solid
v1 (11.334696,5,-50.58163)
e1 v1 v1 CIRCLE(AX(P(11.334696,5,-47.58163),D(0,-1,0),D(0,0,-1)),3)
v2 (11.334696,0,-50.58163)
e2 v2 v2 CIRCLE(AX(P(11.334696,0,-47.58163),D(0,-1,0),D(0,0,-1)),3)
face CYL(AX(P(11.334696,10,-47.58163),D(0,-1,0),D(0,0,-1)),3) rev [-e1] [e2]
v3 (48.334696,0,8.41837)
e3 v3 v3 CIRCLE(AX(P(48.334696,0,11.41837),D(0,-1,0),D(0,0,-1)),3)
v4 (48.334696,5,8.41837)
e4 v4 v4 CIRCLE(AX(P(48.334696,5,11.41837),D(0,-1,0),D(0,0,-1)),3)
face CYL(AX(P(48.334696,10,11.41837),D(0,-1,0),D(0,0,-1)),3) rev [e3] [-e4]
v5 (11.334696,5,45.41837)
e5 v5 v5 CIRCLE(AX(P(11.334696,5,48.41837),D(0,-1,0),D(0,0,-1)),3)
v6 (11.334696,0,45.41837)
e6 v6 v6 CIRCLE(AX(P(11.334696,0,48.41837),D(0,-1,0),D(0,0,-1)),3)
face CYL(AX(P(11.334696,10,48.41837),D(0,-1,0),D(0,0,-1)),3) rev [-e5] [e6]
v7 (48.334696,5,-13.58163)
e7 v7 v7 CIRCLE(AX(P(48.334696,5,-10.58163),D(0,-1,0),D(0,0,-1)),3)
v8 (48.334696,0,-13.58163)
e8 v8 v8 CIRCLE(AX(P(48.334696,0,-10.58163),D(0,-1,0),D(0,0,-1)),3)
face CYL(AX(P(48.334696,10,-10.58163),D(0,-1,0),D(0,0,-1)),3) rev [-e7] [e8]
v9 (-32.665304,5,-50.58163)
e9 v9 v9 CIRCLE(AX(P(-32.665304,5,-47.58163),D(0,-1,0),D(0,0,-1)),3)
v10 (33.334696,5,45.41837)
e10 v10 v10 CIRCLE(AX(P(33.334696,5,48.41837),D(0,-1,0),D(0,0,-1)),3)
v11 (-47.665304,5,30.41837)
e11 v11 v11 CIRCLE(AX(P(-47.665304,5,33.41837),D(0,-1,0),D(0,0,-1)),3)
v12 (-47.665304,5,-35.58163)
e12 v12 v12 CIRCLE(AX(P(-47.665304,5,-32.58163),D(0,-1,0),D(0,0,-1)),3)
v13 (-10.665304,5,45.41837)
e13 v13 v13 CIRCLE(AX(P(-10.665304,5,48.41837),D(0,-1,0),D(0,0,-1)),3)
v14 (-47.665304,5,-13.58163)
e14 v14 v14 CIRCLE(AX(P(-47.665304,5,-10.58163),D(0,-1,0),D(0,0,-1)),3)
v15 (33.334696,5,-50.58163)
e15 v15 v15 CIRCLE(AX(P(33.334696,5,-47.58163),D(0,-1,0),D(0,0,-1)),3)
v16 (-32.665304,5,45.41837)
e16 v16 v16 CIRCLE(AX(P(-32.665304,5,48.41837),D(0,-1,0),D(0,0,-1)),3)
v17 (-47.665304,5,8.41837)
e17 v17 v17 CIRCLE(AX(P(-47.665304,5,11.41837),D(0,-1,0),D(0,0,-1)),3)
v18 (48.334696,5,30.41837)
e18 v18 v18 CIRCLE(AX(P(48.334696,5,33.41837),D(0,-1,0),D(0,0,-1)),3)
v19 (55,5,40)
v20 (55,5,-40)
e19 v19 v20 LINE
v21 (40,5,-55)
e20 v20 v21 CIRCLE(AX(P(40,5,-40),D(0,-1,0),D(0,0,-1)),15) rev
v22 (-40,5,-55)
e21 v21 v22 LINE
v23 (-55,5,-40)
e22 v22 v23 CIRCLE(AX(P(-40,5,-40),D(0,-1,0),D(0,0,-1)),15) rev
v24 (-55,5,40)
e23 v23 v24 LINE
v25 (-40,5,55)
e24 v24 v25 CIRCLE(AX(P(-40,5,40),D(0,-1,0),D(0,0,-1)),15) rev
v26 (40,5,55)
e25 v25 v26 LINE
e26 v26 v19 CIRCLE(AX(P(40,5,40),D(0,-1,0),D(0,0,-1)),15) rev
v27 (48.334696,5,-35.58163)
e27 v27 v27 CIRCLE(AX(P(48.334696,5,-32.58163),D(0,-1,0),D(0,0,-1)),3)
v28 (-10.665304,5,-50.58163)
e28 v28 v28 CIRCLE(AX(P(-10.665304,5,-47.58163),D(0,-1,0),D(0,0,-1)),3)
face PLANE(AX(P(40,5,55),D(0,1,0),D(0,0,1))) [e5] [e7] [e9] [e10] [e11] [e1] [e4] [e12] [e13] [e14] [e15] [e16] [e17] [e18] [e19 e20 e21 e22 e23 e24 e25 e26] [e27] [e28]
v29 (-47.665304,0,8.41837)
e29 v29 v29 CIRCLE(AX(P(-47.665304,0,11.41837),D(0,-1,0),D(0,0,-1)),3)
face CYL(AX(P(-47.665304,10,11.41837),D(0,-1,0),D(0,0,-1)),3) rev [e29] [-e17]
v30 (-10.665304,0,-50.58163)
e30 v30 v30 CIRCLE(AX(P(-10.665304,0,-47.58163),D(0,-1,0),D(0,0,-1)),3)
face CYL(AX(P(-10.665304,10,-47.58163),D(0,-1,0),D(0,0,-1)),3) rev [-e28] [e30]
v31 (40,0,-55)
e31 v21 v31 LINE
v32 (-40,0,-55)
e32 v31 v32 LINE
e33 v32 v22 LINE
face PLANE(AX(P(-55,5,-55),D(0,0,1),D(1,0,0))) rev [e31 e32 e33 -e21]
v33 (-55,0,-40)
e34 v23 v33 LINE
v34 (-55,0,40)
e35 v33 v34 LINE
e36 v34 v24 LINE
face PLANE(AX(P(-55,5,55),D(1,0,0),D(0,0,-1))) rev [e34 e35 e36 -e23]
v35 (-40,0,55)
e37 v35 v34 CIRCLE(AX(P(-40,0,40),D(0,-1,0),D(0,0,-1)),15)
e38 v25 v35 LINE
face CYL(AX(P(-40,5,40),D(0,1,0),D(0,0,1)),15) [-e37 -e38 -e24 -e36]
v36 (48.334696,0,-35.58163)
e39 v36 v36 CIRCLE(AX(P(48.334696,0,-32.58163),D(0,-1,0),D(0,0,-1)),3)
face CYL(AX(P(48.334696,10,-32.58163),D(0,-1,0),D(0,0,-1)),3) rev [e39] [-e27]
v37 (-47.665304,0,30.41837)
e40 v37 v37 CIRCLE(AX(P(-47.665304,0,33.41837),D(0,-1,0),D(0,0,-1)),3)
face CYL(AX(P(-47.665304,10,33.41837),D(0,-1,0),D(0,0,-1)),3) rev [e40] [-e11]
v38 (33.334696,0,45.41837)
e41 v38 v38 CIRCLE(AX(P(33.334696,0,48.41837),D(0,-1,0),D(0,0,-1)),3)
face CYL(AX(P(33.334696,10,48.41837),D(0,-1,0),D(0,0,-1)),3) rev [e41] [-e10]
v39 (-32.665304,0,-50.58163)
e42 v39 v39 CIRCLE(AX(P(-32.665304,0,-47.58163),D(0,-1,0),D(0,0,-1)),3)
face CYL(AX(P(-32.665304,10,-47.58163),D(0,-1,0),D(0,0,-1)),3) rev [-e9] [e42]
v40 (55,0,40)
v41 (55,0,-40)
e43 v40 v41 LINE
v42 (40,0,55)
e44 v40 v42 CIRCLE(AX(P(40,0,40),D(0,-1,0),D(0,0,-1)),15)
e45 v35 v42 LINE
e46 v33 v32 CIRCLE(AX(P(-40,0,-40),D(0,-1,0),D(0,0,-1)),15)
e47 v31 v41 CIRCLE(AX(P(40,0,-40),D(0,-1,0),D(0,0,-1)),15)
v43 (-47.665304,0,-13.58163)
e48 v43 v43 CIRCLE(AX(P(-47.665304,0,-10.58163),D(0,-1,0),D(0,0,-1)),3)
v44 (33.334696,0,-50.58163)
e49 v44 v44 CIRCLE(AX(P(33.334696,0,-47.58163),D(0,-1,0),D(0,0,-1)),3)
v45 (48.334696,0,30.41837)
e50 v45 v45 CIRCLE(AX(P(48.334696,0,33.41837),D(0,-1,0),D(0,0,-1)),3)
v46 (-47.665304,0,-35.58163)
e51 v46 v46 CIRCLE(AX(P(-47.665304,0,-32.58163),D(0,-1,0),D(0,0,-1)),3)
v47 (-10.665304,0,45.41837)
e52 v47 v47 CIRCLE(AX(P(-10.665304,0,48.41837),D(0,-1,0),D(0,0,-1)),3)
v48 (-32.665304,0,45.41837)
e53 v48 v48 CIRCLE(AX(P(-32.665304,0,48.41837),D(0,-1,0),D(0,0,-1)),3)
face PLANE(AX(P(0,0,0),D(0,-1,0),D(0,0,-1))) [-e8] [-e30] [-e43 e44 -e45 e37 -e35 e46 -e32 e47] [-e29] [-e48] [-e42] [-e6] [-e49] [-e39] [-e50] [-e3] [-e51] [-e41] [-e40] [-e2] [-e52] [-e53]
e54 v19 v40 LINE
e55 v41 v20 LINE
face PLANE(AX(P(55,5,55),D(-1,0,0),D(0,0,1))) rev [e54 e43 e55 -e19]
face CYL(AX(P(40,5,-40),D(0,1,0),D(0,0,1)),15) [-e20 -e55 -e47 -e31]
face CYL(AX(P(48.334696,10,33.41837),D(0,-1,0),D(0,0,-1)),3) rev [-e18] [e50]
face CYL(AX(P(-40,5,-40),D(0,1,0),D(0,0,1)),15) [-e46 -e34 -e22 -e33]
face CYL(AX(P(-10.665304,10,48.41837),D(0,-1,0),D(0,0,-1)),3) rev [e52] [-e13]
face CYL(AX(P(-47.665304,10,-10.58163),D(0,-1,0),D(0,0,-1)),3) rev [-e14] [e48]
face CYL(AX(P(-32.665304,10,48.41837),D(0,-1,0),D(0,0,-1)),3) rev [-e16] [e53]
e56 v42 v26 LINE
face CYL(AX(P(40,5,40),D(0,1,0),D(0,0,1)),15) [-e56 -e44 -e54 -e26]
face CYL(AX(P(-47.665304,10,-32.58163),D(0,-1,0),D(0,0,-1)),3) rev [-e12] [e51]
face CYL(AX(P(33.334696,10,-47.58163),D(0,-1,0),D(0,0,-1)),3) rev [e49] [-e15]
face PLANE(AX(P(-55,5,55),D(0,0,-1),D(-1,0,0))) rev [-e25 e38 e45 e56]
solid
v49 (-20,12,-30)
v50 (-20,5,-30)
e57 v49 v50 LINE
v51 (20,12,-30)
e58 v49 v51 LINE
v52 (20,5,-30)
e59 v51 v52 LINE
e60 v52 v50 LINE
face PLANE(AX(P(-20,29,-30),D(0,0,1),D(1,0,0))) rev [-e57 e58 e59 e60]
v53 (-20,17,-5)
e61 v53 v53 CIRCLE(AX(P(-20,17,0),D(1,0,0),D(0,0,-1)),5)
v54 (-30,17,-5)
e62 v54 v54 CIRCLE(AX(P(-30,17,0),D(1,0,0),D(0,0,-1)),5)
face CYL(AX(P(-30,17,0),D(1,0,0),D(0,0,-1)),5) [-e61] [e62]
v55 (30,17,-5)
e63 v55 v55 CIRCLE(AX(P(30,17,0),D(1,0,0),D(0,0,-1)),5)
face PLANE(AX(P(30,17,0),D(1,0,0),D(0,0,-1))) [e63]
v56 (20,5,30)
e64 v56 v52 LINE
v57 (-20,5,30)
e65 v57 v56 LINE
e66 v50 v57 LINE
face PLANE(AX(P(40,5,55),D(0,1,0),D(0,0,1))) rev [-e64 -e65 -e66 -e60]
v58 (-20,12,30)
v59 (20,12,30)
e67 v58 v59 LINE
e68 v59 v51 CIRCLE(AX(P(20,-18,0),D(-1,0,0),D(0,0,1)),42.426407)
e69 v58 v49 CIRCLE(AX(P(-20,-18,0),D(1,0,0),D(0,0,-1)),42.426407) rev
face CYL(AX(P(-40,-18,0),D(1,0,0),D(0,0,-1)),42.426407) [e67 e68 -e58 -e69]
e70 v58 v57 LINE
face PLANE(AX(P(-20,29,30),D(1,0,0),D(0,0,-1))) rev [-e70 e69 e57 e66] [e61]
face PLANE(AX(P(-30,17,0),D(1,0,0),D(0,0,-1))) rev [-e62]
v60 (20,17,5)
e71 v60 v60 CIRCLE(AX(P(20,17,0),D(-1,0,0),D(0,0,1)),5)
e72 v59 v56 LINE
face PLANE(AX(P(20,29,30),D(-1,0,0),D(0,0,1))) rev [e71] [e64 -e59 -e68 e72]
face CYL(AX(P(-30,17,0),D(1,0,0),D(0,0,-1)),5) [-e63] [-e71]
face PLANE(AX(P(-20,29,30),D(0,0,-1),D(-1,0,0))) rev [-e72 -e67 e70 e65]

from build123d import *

# Parameters (mm, degrees)
SKETCH1_W                = 110
SKETCH1_H                = 110
BOSS_EXTRUDE1_DEPTH      = 5
FILLET2_R                = 15
FILLET3_R                = 15
FILLET4_R                = 15
FILLET5_R                = 15
SKETCH2_W                = 40
SKETCH2_H                = 60
BOSS_EXTRUDE2_DEPTH      = 24
BOSS_EXTRUDE3_DEPTH      = 10
BOSS_EXTRUDE3_DEPTH_BACK = 50
SKETCH4_R                = 5
FILLET6_R                = 10
FILLET7_R                = 10
SKETCH5_R                = 3
CUT_EXTRUDE1_DEPTH       = 10
CUT_EXTRUDE2_DEPTH       = 60


with BuildPart() as part:
    # Sketch1 → Boss-Extrude1 (new body)
    with BuildSketch(Plane(origin=(0, 0, 0), x_dir=(1, 0, 0), z_dir=(0, 1, 0))):
        Rectangle(SKETCH1_W, SKETCH1_H)
    extrude(amount=BOSS_EXTRUDE1_DEPTH)

    # Fillet2
    fillet2_edges = [part.edges().sort_by_distance(p)[0] for p in [
        (55, 2.5, -55),
    ]]
    fillet(fillet2_edges, radius=FILLET2_R)

    # Fillet3
    fillet3_edges = [part.edges().sort_by_distance(p)[0] for p in [
        (-55, 2.5, -55),
    ]]
    fillet(fillet3_edges, radius=FILLET3_R)

    # Fillet4
    fillet4_edges = [part.edges().sort_by_distance(p)[0] for p in [
        (-55, 2.5, 55),
    ]]
    fillet(fillet4_edges, radius=FILLET4_R)

    # Fillet5
    fillet5_edges = [part.edges().sort_by_distance(p)[0] for p in [
        (55, 2.5, 55),
    ]]
    fillet(fillet5_edges, radius=FILLET5_R)

    # Sketch2 → Boss-Extrude2 (add)
    with BuildSketch(Plane(origin=(0, 5, 0), x_dir=(1, 0, 0), z_dir=(0, 1, 0))):
        Rectangle(SKETCH2_W, SKETCH2_H)
    extrude(amount=BOSS_EXTRUDE2_DEPTH)

    # Sketch4 → Boss-Extrude3 (add, two sides: drawn at the far end of the back side and taken through both)
    with BuildSketch(Plane(origin=(20, 0, 0), x_dir=(0, 0, -1), z_dir=(1, 0, 0)).offset(-BOSS_EXTRUDE3_DEPTH_BACK)):
        with Locations((0, 17)):
            Circle(SKETCH4_R)
    extrude(amount=BOSS_EXTRUDE3_DEPTH + BOSS_EXTRUDE3_DEPTH_BACK)

    # Fillet6
    fillet6_edges = [part.edges().sort_by_distance(p)[0] for p in [
        (0, 29, 30),
    ]]
    fillet(fillet6_edges, radius=FILLET6_R)

    # Fillet7
    fillet7_edges = [part.edges().sort_by_distance(p)[0] for p in [
        (0, 29, -30),
    ]]
    fillet(fillet7_edges, radius=FILLET7_R)

    # Sketch5 → Cut-Extrude1 (cut)
    with BuildSketch(Plane.XZ):
        with Locations((48.334696306, -10.581629618)):
            Circle(SKETCH5_R)
        with Locations((48.334696306, 33.418370382)):
            Circle(SKETCH5_R)
        with Locations((-47.665303694, 11.418370382)):
            Circle(SKETCH5_R)
        with Locations((-47.665303694, -10.581629618)):
            Circle(SKETCH5_R)
        with Locations((-47.665303694, -32.581629618)):
            Circle(SKETCH5_R)
        with Locations((-32.665303694, -47.581629618)):
            Circle(SKETCH5_R)
        with Locations((-10.665303694, -47.581629618)):
            Circle(SKETCH5_R)
        with Locations((11.334696306, -47.581629618)):
            Circle(SKETCH5_R)
        with Locations((33.334696306, -47.581629618)):
            Circle(SKETCH5_R)
        with Locations((48.334696306, -32.581629618)):
            Circle(SKETCH5_R)
        with Locations((48.334696306, 11.418370382)):
            Circle(SKETCH5_R)
        with Locations((33.334696306, 48.418370382)):
            Circle(SKETCH5_R)
        with Locations((11.334696306, 48.418370382)):
            Circle(SKETCH5_R)
        with Locations((-10.665303694, 48.418370382)):
            Circle(SKETCH5_R)
        with Locations((-32.665303694, 48.418370382)):
            Circle(SKETCH5_R)
        with Locations((-47.665303694, 33.418370382)):
            Circle(SKETCH5_R)
    extrude(amount=-CUT_EXTRUDE1_DEPTH, mode=Mode.SUBTRACT)

    # Sketch6 → Cut-Extrude2 (cut)
    with BuildSketch(Plane(origin=(20, 0, 0), x_dir=(0, 0, -1), z_dir=(1, 0, 0))):
        with BuildLine():
            Line((30, 19), (30, 12))
            ThreePointArc((30, 12), (0, 24.426406871), (-30, 12))
            Line((-30, 12), (-30, 19))
            ThreePointArc((-30, 19), (-27.071067812, 26.071067812), (-20, 29))
            Line((-20, 29), (20, 29))
            ThreePointArc((20, 29), (27.071067812, 26.071067812), (30, 19))
        make_face()
    extrude(amount=-CUT_EXTRUDE2_DEPTH, mode=Mode.SUBTRACT)


with BuildPart() as body_2:
    # Split1: the piece on the far side of the plane
    add(part.part)
    split(bisect_by=Plane(origin=(0, 5, 0), x_dir=(0, 0, -1), z_dir=(0, -1, 0)), keep=Keep.BOTTOM)


with BuildPart() as part_1:
    add(part.part)

    # Split1
    split(bisect_by=Plane(origin=(0, 5, 0), x_dir=(0, 0, -1), z_dir=(0, -1, 0)), keep=Keep.TOP)


solid = Compound([body_2.part, part_1.part])
